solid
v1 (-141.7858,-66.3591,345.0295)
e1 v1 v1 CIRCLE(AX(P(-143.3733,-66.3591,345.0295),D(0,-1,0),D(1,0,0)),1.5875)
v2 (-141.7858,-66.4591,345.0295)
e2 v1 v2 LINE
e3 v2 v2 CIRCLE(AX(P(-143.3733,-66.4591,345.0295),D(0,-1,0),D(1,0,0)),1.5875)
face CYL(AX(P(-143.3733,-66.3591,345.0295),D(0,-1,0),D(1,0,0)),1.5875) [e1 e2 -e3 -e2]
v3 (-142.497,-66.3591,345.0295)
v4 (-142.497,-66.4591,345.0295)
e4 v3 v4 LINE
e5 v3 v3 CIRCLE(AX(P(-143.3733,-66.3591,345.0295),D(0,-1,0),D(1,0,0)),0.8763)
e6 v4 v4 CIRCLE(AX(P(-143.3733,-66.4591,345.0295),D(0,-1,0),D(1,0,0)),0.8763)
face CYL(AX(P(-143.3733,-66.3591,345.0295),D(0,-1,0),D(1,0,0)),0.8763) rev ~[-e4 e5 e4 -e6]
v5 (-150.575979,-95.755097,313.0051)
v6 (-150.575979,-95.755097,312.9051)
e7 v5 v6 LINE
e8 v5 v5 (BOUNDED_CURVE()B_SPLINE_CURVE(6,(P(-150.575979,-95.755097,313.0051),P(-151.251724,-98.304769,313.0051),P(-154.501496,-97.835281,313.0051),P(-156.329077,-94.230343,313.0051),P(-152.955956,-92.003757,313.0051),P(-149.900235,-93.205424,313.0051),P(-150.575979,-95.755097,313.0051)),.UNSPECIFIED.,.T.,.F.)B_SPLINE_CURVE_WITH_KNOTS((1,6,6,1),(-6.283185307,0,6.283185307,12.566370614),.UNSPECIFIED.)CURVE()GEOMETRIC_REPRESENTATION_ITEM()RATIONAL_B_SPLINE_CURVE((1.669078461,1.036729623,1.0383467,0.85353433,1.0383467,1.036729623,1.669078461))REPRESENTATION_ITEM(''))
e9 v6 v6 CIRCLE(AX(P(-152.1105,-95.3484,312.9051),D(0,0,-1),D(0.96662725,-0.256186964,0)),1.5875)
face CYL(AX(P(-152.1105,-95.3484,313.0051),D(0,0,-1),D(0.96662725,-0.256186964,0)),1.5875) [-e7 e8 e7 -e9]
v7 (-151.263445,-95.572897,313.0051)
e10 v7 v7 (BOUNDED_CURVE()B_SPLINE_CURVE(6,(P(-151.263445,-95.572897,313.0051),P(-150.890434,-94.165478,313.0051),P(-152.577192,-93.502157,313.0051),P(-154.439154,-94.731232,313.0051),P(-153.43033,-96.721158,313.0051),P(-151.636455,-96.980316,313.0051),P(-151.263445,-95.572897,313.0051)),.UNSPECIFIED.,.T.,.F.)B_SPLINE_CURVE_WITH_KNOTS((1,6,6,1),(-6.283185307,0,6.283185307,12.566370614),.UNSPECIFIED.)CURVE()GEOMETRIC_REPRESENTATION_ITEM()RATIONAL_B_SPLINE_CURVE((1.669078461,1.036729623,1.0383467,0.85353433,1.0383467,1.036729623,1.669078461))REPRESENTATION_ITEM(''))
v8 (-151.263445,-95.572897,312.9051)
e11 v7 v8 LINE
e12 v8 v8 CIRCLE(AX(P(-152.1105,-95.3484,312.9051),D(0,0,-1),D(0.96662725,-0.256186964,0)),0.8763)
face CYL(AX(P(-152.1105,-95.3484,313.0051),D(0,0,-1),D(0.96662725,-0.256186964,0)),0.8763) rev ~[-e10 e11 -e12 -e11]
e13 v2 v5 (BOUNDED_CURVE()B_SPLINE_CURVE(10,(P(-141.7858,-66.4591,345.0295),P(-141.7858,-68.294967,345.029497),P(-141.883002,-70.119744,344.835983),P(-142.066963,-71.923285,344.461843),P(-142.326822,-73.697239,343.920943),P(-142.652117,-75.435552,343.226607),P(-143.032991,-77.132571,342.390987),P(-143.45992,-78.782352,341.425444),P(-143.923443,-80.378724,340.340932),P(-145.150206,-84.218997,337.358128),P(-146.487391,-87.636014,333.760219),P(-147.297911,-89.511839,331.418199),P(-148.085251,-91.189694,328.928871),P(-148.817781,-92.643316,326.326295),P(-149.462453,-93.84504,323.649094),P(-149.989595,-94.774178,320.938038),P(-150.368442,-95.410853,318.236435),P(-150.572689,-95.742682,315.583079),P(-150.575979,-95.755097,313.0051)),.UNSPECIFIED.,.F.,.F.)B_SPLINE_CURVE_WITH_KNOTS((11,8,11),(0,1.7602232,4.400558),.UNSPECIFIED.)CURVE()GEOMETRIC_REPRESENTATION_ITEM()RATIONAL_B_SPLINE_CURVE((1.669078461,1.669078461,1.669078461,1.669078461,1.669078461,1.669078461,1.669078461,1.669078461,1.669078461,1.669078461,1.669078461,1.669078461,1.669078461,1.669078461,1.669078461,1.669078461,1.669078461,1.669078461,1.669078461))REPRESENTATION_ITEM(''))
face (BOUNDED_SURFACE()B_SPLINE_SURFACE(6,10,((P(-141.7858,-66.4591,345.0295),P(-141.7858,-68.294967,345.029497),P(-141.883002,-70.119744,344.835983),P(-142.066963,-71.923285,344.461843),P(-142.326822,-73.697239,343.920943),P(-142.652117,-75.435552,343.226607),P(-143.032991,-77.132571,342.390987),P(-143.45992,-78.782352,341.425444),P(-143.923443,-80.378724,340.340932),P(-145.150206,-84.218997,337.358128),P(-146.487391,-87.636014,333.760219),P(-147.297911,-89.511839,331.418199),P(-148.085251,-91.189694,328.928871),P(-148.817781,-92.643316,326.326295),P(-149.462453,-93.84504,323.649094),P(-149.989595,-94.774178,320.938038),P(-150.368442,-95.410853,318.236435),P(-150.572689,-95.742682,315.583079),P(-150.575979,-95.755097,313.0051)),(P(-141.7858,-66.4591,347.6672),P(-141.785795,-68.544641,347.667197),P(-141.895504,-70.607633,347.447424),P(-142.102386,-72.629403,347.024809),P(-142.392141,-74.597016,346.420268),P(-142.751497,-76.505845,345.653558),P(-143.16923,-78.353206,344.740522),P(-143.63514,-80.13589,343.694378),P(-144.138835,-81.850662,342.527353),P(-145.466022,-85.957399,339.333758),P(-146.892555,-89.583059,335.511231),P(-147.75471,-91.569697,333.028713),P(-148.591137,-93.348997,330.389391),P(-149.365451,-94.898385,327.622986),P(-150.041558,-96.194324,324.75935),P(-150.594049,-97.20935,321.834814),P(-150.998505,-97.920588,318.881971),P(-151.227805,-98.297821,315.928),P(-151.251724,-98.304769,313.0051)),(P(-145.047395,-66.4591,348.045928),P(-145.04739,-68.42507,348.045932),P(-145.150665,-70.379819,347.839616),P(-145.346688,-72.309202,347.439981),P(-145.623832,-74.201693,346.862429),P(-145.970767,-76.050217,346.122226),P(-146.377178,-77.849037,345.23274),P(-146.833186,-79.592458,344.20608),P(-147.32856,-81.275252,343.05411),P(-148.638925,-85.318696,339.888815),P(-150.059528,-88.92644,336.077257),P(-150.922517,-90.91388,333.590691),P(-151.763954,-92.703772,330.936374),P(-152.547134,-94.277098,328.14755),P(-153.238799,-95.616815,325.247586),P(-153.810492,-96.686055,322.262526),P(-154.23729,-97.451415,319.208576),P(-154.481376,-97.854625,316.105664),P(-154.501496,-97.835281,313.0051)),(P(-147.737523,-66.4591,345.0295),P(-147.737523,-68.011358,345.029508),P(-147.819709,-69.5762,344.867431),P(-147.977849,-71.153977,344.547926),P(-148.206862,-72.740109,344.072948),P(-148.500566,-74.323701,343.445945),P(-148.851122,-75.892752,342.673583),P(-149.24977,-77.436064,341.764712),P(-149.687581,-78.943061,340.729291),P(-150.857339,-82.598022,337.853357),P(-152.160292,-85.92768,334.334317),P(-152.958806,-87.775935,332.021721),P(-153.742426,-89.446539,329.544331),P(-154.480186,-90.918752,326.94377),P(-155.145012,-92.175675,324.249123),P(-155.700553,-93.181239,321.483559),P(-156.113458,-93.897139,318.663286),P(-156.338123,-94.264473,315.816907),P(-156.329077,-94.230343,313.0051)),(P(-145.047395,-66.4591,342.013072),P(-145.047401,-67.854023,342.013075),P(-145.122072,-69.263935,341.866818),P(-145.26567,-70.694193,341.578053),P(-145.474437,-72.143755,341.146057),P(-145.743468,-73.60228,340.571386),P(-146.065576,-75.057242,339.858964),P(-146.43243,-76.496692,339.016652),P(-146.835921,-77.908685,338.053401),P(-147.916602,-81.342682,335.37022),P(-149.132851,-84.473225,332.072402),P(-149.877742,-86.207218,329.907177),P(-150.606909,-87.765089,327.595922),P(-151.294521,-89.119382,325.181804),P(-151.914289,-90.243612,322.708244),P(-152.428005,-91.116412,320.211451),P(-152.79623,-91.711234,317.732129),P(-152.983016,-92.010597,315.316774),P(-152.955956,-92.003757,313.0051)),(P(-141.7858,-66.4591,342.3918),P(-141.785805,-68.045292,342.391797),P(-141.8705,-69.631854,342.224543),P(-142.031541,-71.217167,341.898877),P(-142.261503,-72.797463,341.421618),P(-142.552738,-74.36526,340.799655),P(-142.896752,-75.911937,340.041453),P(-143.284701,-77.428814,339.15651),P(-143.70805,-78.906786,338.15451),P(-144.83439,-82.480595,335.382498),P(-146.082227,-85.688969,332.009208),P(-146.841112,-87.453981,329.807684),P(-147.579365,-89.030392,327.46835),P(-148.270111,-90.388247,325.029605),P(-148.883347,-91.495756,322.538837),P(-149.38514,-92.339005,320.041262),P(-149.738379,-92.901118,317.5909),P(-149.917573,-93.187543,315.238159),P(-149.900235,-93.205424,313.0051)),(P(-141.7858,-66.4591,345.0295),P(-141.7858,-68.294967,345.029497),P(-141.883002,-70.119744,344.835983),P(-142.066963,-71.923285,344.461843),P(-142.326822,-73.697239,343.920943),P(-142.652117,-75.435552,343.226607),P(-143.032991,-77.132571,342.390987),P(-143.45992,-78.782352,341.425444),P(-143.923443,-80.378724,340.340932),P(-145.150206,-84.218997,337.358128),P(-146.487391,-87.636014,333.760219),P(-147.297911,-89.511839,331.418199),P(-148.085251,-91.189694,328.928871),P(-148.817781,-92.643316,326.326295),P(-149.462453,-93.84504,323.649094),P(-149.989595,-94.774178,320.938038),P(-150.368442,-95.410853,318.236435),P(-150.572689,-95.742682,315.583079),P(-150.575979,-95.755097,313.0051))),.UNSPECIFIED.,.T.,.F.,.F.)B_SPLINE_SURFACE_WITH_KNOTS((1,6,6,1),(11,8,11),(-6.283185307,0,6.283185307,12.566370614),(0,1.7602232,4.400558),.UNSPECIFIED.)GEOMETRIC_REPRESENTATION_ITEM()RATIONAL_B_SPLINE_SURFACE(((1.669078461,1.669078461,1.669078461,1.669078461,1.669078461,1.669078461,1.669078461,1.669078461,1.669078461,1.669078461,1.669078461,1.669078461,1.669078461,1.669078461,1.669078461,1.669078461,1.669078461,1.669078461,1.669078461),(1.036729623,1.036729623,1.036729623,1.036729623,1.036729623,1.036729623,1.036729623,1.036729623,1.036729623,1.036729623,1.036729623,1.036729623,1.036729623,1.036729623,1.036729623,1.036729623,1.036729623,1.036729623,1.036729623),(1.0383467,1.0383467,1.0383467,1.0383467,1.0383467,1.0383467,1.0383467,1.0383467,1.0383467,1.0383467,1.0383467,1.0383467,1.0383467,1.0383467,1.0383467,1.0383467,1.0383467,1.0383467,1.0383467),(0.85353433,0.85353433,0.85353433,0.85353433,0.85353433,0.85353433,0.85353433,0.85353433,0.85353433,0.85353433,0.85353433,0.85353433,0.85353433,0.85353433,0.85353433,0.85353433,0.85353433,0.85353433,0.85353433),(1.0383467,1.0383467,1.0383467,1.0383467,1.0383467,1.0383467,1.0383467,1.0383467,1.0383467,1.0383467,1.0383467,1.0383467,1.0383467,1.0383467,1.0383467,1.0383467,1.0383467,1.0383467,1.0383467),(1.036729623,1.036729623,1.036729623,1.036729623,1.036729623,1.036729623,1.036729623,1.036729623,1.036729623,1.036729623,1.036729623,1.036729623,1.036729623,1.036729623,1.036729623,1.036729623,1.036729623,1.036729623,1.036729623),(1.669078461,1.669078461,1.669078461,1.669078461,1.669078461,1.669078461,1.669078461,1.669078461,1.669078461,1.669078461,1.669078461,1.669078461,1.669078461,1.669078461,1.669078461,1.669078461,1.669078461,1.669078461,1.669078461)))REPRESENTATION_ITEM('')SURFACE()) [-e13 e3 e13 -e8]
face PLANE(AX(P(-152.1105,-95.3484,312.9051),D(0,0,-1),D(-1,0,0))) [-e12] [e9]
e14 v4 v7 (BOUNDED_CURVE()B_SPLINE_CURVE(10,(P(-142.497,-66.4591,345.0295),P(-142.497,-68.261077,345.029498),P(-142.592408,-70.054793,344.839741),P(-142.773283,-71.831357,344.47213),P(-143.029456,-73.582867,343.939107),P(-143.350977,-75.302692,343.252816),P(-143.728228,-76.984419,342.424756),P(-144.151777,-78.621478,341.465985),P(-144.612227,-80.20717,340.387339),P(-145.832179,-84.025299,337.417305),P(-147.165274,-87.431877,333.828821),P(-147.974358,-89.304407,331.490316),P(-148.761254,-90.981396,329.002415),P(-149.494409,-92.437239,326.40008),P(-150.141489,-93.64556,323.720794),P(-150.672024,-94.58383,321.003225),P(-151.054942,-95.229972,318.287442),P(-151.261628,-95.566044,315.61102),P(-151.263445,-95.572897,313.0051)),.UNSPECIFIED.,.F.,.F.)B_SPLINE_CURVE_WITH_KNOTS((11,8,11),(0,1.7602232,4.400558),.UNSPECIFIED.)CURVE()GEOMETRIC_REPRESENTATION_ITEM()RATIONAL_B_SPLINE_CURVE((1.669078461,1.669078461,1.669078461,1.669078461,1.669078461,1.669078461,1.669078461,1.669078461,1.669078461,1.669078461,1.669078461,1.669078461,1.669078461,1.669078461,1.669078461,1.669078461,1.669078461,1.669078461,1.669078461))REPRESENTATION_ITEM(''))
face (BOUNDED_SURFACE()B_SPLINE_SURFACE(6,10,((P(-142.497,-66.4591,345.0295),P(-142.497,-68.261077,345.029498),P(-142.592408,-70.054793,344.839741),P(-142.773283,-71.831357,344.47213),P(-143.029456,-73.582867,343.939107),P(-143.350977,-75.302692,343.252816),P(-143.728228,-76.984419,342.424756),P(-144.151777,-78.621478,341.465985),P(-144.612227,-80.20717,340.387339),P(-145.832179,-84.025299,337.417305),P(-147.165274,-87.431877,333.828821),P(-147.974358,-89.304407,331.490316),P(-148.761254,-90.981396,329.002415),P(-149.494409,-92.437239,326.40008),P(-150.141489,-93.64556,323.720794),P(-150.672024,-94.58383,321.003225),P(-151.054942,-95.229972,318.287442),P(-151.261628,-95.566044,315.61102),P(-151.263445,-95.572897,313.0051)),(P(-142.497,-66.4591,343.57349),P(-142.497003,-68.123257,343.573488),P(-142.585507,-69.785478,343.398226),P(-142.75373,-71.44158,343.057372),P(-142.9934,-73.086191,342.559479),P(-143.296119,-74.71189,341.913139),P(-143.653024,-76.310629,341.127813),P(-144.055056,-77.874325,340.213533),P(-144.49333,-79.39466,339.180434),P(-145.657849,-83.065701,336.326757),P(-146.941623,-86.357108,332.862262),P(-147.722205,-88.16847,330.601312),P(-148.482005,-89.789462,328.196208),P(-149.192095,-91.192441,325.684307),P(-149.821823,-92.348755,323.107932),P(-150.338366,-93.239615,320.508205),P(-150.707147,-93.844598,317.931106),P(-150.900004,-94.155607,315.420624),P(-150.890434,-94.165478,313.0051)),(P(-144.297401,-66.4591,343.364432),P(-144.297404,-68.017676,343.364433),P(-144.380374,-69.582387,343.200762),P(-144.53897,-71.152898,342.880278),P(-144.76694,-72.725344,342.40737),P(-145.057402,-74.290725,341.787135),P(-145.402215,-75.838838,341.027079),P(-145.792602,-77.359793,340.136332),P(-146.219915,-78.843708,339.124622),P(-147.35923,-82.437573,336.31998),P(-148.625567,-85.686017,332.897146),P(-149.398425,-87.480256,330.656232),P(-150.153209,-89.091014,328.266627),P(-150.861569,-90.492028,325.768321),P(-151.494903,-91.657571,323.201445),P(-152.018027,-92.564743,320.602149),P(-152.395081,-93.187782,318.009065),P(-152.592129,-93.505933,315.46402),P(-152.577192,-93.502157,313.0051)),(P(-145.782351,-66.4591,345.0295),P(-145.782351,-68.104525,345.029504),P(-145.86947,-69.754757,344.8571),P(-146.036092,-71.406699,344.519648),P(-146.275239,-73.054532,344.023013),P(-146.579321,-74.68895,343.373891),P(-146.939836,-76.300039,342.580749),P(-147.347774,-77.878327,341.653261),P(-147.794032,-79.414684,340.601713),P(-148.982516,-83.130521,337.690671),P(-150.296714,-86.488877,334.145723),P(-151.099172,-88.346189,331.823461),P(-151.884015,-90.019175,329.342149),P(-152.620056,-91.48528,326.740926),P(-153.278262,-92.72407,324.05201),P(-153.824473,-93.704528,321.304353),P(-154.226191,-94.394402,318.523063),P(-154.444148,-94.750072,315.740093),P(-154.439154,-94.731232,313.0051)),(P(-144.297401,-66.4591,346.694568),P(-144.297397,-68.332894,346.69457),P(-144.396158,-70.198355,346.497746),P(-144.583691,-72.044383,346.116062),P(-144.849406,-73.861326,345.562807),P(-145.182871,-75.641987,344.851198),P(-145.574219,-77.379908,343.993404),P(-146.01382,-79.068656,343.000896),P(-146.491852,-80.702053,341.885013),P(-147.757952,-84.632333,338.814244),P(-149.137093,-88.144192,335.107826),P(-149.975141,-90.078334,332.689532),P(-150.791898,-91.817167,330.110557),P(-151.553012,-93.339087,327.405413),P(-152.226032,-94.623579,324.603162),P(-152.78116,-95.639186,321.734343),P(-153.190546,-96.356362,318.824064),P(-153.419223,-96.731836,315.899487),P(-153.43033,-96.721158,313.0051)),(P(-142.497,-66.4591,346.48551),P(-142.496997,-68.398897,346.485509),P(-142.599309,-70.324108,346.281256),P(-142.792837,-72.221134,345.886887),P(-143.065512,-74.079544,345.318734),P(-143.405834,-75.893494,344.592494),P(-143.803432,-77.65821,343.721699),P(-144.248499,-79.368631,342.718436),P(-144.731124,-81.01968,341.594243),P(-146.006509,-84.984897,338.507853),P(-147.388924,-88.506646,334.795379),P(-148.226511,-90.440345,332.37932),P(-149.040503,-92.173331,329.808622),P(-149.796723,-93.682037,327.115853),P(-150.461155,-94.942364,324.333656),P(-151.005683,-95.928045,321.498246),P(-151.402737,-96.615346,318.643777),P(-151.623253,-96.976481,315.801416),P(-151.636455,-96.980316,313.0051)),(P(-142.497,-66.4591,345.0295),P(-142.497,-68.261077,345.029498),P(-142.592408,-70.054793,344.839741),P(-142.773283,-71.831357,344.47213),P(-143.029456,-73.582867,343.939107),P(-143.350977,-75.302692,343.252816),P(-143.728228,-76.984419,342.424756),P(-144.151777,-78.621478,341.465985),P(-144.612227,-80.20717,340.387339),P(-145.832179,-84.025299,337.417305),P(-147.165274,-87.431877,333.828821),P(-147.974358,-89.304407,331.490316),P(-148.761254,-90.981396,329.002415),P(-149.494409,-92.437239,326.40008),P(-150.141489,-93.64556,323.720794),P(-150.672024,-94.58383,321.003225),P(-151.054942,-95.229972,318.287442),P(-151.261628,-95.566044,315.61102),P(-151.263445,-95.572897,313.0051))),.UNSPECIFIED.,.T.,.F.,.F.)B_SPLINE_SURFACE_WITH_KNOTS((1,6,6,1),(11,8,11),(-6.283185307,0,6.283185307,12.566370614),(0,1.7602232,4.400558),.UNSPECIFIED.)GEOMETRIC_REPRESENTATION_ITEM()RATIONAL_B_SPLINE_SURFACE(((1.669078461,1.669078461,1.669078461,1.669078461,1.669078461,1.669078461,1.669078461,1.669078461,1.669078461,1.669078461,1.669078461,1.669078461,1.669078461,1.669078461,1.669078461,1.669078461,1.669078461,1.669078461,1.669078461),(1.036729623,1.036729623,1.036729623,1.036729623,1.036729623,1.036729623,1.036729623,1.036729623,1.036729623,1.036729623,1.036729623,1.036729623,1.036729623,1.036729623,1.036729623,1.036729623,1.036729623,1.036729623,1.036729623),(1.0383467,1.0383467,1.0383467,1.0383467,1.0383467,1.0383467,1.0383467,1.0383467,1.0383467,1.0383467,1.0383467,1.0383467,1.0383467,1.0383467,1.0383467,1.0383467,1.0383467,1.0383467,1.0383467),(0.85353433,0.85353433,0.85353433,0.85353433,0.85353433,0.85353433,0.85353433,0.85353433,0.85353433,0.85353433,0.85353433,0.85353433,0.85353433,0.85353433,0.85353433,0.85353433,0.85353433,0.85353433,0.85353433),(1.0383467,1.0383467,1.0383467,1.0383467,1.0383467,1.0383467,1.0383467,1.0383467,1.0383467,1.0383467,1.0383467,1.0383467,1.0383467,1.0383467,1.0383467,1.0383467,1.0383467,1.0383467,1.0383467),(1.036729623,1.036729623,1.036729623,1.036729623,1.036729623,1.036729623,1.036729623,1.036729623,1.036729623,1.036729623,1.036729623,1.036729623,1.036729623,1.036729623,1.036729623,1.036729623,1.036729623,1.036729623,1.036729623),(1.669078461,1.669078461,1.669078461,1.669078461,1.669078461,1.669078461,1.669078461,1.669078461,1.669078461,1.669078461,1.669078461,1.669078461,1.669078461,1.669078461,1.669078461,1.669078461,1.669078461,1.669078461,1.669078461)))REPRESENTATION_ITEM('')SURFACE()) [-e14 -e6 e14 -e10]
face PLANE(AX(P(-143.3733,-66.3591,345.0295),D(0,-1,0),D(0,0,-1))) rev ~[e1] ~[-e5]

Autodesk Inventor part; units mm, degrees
ref_plane "YZ Plane" through (0, 0, 0) normal (1, 0, 0) x (0, 1, 0)
ref_plane "XZ Plane" through (0, 0, 0) normal (0, 1, 0) x (-1, 0, 0)
ref_plane "XY Plane" through (0, 0, 0) normal (0, 0, 1) x (1, 0, 0)
ref_plane "Work Plane3" through (-143.3733, -66.4591, 345.0295) normal (0, -1, 0) x (1, 0, 0)
sketch "Sketch3" plane through (-143.3733, -66.4591, 345.0295) normal (0, -1, 0) x (1, 0, 0)
  circle A0 centre (0, 0) radius 1.5875
  circle A1 centre (0, 0) radius 0.8763
sketch3d "3D Sketch1"
  line L0 (-143.3733, -66.3591, 345.0295) -> (-143.3733, -66.4591, 345.0295)
  spline S0 degree 3 poles (-143.3733, -66.4591, 345.0295) (-143.3733, -81.1276, 345.0295) (-152.1105, -95.3484, 327.6737) (-152.1105, -95.3484, 313.0051) knots 0 0 0 0 4.400558 4.400558 4.400558 4.400558
  line L1 (-152.1105, -95.3484, 313.0051) -> (-152.1105, -95.3484, 312.9051)
  dimension "d6" = 1
  dimension "d7" = 1
sweep "Sweep1" add profiles "Sketch3" path "3D Sketch1"
equation "\"OD\" = 3.175"
equation "\"t\" = 0.7112"
equation "\"L\" = PL"
equation "\"ID\" = 1.7526"
equation "\"PL\" = 47.9298"
equation "\"D\" = 12.7"
equation "\"Size_Designation\" = 1.2345"
equation "\"RPL\" = 50.8"
equation "\"OPL\" = 47.9298"
equation "\"ROPL\" = 50.8"
properties material "Stainless Steel"
